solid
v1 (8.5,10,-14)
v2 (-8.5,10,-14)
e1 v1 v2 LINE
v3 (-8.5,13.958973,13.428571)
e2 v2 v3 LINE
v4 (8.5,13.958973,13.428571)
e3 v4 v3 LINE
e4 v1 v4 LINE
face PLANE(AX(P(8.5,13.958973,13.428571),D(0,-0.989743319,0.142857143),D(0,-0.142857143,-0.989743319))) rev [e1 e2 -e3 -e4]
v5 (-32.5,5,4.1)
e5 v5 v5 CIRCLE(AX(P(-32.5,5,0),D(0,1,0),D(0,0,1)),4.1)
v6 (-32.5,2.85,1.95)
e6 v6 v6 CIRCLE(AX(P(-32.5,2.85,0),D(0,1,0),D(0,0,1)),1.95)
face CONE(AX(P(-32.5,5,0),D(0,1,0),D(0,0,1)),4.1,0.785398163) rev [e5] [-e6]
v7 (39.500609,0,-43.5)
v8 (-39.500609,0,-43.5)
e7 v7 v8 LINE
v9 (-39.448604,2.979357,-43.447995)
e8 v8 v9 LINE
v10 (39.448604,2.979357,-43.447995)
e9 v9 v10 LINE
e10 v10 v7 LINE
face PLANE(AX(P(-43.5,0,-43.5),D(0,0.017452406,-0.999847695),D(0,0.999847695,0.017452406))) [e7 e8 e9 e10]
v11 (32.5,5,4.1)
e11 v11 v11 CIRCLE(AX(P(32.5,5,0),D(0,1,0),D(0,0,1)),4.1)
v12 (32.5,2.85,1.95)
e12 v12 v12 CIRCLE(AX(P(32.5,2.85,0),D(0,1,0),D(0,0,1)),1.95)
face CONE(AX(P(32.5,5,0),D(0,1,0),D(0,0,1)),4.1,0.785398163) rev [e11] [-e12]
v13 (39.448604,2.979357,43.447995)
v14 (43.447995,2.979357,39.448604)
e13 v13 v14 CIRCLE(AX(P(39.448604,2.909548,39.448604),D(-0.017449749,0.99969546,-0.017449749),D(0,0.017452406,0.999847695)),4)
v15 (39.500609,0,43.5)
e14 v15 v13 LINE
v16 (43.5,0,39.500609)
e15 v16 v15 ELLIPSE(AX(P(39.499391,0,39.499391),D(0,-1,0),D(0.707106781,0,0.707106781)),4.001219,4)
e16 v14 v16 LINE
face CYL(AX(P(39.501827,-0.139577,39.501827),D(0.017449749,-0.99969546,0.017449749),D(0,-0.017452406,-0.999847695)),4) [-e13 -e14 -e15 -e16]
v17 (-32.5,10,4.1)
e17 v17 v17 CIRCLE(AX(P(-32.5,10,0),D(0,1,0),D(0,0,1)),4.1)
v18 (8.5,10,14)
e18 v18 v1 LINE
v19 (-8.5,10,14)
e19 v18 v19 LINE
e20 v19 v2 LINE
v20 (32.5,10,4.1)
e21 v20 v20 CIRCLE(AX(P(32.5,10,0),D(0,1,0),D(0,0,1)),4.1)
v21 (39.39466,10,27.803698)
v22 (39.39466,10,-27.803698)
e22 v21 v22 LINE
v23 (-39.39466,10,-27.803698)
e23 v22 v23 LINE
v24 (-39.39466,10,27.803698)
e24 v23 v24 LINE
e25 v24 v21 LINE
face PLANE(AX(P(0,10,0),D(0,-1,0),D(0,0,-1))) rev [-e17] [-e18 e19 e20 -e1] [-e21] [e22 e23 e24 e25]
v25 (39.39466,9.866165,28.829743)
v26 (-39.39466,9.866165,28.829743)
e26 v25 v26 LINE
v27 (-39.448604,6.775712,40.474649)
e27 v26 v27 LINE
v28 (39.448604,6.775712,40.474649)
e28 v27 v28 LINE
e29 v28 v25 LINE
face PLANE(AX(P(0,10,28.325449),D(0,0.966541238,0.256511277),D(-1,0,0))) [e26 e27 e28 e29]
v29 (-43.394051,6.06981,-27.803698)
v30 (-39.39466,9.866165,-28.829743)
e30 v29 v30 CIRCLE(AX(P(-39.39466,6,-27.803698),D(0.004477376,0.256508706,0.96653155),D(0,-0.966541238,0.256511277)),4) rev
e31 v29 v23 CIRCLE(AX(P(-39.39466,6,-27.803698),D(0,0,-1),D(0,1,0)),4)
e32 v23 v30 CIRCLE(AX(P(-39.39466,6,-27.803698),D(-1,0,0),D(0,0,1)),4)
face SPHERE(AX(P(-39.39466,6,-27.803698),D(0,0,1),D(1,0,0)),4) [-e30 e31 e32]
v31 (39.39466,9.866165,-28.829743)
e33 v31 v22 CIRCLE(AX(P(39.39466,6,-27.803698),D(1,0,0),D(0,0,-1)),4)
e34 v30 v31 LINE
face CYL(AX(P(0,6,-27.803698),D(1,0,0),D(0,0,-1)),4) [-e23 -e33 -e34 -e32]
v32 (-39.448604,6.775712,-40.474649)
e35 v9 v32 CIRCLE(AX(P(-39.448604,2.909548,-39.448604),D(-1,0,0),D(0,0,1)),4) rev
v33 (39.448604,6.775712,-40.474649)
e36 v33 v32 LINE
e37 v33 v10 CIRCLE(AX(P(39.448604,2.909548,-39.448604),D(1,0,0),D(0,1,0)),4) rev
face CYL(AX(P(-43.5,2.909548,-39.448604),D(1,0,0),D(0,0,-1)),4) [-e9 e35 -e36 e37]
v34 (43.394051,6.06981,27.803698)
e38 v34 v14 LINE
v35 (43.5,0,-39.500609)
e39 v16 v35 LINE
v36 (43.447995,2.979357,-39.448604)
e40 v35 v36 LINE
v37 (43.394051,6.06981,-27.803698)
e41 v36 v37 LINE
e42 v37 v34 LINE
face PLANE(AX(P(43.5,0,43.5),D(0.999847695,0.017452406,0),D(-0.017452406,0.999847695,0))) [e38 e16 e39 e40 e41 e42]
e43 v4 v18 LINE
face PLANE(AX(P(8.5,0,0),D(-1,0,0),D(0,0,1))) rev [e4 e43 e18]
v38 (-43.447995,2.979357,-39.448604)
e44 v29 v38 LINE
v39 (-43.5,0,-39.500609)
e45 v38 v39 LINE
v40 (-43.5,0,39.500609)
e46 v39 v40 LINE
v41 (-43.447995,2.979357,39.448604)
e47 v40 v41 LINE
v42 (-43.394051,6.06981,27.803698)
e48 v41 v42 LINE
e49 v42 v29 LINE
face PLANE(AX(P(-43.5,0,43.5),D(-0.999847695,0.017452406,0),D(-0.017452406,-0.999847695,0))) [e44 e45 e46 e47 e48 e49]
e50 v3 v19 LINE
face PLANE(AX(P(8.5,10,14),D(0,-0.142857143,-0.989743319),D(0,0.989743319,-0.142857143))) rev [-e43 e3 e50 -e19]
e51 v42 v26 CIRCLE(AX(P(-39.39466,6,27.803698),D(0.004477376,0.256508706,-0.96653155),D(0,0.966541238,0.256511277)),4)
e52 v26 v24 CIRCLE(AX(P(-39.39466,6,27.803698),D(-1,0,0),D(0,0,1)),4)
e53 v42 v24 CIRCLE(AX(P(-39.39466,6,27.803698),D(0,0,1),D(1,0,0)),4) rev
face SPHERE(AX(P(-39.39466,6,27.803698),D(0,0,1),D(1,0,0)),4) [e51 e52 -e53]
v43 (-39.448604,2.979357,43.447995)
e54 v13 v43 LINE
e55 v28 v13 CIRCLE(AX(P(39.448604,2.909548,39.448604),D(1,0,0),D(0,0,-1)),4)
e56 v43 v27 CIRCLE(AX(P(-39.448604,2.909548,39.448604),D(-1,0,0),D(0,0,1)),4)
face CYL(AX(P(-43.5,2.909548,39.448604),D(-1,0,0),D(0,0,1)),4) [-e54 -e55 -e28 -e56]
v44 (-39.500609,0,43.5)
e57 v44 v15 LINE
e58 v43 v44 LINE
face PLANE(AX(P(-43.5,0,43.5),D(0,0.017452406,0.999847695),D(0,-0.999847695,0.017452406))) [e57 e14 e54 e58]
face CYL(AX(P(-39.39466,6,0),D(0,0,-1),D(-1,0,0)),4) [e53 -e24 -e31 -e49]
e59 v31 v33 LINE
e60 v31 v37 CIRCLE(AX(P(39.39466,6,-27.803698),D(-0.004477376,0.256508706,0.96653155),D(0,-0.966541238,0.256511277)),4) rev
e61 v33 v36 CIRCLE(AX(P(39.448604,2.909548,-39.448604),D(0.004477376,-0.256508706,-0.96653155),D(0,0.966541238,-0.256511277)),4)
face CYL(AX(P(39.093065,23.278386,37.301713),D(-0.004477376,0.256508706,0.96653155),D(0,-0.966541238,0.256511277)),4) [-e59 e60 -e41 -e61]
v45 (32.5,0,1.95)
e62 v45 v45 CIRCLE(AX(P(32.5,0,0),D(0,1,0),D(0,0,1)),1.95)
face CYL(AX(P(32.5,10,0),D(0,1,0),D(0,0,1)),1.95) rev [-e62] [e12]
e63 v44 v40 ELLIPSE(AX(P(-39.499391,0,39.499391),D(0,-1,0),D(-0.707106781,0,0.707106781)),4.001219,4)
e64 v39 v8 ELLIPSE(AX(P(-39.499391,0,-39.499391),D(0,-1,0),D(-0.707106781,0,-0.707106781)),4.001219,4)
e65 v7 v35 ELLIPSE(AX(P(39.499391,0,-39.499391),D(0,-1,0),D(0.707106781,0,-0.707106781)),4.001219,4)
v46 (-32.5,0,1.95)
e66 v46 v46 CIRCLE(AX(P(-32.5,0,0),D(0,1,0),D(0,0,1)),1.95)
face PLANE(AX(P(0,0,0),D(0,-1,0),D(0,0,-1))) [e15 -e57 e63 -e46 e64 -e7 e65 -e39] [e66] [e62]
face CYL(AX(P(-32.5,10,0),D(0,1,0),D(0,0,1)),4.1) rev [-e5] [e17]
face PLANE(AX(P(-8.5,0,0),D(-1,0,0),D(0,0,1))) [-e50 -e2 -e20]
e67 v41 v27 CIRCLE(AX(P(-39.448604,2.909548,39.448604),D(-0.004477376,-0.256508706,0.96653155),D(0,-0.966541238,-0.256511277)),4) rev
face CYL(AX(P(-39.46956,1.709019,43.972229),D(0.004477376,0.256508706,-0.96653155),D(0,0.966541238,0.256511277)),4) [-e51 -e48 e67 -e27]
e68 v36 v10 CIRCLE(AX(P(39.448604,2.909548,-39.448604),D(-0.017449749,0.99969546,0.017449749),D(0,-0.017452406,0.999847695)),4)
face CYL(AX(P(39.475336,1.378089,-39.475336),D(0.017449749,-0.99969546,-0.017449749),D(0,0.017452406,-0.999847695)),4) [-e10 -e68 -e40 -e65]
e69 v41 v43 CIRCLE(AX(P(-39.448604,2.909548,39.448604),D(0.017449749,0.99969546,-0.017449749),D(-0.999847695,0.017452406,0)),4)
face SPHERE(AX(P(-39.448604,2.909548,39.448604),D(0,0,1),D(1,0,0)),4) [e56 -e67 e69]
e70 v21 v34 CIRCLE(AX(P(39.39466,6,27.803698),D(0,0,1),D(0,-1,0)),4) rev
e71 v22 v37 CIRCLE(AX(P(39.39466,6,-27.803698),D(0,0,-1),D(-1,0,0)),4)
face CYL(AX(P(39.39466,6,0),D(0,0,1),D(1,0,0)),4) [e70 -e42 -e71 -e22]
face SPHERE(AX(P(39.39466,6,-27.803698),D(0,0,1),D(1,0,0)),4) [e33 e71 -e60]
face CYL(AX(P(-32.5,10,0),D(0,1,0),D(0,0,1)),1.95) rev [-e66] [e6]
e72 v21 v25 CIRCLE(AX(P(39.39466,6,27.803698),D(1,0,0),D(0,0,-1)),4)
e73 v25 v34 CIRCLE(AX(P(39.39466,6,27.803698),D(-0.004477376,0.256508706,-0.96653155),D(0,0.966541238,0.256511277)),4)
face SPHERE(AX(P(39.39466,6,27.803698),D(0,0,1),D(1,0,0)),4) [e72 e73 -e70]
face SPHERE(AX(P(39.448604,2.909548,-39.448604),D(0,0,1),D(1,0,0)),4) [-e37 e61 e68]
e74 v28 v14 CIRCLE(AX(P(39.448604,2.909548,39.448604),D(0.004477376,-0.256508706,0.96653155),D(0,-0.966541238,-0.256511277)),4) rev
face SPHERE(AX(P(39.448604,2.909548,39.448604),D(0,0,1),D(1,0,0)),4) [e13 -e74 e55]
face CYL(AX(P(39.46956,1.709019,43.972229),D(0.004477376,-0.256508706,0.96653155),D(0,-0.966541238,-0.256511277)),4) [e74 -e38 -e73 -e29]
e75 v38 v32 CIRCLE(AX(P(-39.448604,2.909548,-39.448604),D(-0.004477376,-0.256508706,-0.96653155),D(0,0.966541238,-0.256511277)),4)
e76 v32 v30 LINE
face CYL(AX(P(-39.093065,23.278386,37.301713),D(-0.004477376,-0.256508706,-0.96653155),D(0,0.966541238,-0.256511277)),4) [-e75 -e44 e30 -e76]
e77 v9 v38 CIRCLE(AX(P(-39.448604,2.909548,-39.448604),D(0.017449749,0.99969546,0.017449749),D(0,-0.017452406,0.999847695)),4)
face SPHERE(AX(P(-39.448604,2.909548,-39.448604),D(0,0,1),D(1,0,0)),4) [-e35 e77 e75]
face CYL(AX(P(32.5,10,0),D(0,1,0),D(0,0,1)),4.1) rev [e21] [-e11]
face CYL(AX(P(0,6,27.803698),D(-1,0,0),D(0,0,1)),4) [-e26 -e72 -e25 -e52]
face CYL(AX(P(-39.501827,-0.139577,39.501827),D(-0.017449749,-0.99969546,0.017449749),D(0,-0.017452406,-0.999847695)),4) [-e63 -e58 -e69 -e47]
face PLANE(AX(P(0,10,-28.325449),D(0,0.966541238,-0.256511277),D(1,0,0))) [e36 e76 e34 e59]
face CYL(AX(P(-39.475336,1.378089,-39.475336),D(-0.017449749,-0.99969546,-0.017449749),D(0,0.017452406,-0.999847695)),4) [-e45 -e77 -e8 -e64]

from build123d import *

# Parameters (mm, degrees)
SKETCH1_W                                      = 87
SKETCH1_H                                      = 87
BOSS_EXTRUDE1_DEPTH                            = 10
BOSS_EXTRUDE1_TAPER                            = 1
CHAMFER1_SIZE                                  = 4
CHAMFER1_SIZE_2                                = 15
BOSS_EXTRUDE2_DEPTH                            = 8.5
FILLET1_R                                      = 4
CSK_FOR_M3_5_FLAT_HEAD_MACHINE_SCREW1_AT_COUNT = 2
CSK_FOR_M3_5_FLAT_HEAD_MACHINE_SCREW1_AT_PITCH = 65


with BuildPart() as part:
    # Sketch1 → Boss-Extrude1 (new body)
    with BuildSketch(Plane(origin=(0, 0, 0), x_dir=(1, 0, 0), z_dir=(0, 1, 0))):
        Rectangle(SKETCH1_W, SKETCH1_H)
    extrude(amount=BOSS_EXTRUDE1_DEPTH, taper=BOSS_EXTRUDE1_TAPER)

    # Chamfer1
    # the kernel refuses this chamfer: 15, 4 mm, written as the material it takes off along each edge
    with BuildSketch(Plane(origin=(-82.277161627, 10, 43.325449351), x_dir=(0, -0.9879836574445086, 0.1545583793347103), z_dir=(1, 0, 0)), Plane(origin=(82.277161627, 10, -43.325449351), x_dir=(0, -0.9879836574445086, -0.1545583793347103), z_dir=(-1, 0, 0))) as chamfer1_piece_1:
        Polygon((CHAMFER1_SIZE * 0.990530598403, CHAMFER1_SIZE * 0.137292147002), (-CHAMFER1_SIZE_2 * 0.154558379335, CHAMFER1_SIZE_2 * 0.987983657445), (0, 0), align=None)
    extrude(amount=164.554323254, mode=Mode.SUBTRACT)

    # Sketch2 → Boss-Extrude2 (add, symmetric)
    with BuildSketch(Plane(origin=(0, 0, 0), x_dir=(0, 0, -1), z_dir=(1, 0, 0))):
        Polygon((-14, 10), (-13.428571429, 13.958973274), (14, 10), align=None)
    extrude(amount=BOSS_EXTRUDE2_DEPTH, both=True)

    # Fillet1
    fillet1_edges = [part.edges().sort_by_distance(p)[0] for p in [
        (43.325449351, 10, 0),
        (-43.325449351, 10, 0),
        (0, 10, 28.325449351),
        (0, 10, -28.325449351),
        (-43.447629488, 3.00030461, 43.447629488),
        (-43.447629488, 3.00030461, -43.447629488),
        (-43.360354164, 8.00030461, 35.860354164),
        (-43.360354164, 8.00030461, -35.860354164),
        (43.447629488, 3.00030461, -43.447629488),
        (0, 6.000609219, -43.395258976),
        (43.447629488, 3.00030461, 43.447629488),
        (43.360354164, 8.00030461, 35.860354164),
        (43.360354164, 8.00030461, -35.860354164),
        (0, 6.000609219, 43.395258976),
    ]]
    fillet(fillet1_edges, radius=FILLET1_R)

    # Sketch3 → CSK for M3.5 Flat Head Machine Screw1 (revolve, cut)
    with BuildSketch(Plane(origin=(-32.5, 10, 0), x_dir=(0, 0, 1), z_dir=(1, 0, 0))):
        Polygon((0, 0), (0, 10), (1.95, 10), (1.95, 7.15), (4.1, 5), (4.1, 0), align=None)
    csk_for_m3_5_flat_head_machine_screw1 = revolve(axis=Axis((-32.5, 16.35, 0), (0, -1, 0)), mode=Mode.SUBTRACT)

    # CSK for M3.5 Flat Head Machine Screw1 at: CSK for M3.5 Flat Head Machine Screw1 ×2
    with Locations(*[(i * CSK_FOR_M3_5_FLAT_HEAD_MACHINE_SCREW1_AT_PITCH, 0, 0) for i in range(1, CSK_FOR_M3_5_FLAT_HEAD_MACHINE_SCREW1_AT_COUNT)]):
        add(csk_for_m3_5_flat_head_machine_screw1, mode=Mode.SUBTRACT)


solid = part.part
